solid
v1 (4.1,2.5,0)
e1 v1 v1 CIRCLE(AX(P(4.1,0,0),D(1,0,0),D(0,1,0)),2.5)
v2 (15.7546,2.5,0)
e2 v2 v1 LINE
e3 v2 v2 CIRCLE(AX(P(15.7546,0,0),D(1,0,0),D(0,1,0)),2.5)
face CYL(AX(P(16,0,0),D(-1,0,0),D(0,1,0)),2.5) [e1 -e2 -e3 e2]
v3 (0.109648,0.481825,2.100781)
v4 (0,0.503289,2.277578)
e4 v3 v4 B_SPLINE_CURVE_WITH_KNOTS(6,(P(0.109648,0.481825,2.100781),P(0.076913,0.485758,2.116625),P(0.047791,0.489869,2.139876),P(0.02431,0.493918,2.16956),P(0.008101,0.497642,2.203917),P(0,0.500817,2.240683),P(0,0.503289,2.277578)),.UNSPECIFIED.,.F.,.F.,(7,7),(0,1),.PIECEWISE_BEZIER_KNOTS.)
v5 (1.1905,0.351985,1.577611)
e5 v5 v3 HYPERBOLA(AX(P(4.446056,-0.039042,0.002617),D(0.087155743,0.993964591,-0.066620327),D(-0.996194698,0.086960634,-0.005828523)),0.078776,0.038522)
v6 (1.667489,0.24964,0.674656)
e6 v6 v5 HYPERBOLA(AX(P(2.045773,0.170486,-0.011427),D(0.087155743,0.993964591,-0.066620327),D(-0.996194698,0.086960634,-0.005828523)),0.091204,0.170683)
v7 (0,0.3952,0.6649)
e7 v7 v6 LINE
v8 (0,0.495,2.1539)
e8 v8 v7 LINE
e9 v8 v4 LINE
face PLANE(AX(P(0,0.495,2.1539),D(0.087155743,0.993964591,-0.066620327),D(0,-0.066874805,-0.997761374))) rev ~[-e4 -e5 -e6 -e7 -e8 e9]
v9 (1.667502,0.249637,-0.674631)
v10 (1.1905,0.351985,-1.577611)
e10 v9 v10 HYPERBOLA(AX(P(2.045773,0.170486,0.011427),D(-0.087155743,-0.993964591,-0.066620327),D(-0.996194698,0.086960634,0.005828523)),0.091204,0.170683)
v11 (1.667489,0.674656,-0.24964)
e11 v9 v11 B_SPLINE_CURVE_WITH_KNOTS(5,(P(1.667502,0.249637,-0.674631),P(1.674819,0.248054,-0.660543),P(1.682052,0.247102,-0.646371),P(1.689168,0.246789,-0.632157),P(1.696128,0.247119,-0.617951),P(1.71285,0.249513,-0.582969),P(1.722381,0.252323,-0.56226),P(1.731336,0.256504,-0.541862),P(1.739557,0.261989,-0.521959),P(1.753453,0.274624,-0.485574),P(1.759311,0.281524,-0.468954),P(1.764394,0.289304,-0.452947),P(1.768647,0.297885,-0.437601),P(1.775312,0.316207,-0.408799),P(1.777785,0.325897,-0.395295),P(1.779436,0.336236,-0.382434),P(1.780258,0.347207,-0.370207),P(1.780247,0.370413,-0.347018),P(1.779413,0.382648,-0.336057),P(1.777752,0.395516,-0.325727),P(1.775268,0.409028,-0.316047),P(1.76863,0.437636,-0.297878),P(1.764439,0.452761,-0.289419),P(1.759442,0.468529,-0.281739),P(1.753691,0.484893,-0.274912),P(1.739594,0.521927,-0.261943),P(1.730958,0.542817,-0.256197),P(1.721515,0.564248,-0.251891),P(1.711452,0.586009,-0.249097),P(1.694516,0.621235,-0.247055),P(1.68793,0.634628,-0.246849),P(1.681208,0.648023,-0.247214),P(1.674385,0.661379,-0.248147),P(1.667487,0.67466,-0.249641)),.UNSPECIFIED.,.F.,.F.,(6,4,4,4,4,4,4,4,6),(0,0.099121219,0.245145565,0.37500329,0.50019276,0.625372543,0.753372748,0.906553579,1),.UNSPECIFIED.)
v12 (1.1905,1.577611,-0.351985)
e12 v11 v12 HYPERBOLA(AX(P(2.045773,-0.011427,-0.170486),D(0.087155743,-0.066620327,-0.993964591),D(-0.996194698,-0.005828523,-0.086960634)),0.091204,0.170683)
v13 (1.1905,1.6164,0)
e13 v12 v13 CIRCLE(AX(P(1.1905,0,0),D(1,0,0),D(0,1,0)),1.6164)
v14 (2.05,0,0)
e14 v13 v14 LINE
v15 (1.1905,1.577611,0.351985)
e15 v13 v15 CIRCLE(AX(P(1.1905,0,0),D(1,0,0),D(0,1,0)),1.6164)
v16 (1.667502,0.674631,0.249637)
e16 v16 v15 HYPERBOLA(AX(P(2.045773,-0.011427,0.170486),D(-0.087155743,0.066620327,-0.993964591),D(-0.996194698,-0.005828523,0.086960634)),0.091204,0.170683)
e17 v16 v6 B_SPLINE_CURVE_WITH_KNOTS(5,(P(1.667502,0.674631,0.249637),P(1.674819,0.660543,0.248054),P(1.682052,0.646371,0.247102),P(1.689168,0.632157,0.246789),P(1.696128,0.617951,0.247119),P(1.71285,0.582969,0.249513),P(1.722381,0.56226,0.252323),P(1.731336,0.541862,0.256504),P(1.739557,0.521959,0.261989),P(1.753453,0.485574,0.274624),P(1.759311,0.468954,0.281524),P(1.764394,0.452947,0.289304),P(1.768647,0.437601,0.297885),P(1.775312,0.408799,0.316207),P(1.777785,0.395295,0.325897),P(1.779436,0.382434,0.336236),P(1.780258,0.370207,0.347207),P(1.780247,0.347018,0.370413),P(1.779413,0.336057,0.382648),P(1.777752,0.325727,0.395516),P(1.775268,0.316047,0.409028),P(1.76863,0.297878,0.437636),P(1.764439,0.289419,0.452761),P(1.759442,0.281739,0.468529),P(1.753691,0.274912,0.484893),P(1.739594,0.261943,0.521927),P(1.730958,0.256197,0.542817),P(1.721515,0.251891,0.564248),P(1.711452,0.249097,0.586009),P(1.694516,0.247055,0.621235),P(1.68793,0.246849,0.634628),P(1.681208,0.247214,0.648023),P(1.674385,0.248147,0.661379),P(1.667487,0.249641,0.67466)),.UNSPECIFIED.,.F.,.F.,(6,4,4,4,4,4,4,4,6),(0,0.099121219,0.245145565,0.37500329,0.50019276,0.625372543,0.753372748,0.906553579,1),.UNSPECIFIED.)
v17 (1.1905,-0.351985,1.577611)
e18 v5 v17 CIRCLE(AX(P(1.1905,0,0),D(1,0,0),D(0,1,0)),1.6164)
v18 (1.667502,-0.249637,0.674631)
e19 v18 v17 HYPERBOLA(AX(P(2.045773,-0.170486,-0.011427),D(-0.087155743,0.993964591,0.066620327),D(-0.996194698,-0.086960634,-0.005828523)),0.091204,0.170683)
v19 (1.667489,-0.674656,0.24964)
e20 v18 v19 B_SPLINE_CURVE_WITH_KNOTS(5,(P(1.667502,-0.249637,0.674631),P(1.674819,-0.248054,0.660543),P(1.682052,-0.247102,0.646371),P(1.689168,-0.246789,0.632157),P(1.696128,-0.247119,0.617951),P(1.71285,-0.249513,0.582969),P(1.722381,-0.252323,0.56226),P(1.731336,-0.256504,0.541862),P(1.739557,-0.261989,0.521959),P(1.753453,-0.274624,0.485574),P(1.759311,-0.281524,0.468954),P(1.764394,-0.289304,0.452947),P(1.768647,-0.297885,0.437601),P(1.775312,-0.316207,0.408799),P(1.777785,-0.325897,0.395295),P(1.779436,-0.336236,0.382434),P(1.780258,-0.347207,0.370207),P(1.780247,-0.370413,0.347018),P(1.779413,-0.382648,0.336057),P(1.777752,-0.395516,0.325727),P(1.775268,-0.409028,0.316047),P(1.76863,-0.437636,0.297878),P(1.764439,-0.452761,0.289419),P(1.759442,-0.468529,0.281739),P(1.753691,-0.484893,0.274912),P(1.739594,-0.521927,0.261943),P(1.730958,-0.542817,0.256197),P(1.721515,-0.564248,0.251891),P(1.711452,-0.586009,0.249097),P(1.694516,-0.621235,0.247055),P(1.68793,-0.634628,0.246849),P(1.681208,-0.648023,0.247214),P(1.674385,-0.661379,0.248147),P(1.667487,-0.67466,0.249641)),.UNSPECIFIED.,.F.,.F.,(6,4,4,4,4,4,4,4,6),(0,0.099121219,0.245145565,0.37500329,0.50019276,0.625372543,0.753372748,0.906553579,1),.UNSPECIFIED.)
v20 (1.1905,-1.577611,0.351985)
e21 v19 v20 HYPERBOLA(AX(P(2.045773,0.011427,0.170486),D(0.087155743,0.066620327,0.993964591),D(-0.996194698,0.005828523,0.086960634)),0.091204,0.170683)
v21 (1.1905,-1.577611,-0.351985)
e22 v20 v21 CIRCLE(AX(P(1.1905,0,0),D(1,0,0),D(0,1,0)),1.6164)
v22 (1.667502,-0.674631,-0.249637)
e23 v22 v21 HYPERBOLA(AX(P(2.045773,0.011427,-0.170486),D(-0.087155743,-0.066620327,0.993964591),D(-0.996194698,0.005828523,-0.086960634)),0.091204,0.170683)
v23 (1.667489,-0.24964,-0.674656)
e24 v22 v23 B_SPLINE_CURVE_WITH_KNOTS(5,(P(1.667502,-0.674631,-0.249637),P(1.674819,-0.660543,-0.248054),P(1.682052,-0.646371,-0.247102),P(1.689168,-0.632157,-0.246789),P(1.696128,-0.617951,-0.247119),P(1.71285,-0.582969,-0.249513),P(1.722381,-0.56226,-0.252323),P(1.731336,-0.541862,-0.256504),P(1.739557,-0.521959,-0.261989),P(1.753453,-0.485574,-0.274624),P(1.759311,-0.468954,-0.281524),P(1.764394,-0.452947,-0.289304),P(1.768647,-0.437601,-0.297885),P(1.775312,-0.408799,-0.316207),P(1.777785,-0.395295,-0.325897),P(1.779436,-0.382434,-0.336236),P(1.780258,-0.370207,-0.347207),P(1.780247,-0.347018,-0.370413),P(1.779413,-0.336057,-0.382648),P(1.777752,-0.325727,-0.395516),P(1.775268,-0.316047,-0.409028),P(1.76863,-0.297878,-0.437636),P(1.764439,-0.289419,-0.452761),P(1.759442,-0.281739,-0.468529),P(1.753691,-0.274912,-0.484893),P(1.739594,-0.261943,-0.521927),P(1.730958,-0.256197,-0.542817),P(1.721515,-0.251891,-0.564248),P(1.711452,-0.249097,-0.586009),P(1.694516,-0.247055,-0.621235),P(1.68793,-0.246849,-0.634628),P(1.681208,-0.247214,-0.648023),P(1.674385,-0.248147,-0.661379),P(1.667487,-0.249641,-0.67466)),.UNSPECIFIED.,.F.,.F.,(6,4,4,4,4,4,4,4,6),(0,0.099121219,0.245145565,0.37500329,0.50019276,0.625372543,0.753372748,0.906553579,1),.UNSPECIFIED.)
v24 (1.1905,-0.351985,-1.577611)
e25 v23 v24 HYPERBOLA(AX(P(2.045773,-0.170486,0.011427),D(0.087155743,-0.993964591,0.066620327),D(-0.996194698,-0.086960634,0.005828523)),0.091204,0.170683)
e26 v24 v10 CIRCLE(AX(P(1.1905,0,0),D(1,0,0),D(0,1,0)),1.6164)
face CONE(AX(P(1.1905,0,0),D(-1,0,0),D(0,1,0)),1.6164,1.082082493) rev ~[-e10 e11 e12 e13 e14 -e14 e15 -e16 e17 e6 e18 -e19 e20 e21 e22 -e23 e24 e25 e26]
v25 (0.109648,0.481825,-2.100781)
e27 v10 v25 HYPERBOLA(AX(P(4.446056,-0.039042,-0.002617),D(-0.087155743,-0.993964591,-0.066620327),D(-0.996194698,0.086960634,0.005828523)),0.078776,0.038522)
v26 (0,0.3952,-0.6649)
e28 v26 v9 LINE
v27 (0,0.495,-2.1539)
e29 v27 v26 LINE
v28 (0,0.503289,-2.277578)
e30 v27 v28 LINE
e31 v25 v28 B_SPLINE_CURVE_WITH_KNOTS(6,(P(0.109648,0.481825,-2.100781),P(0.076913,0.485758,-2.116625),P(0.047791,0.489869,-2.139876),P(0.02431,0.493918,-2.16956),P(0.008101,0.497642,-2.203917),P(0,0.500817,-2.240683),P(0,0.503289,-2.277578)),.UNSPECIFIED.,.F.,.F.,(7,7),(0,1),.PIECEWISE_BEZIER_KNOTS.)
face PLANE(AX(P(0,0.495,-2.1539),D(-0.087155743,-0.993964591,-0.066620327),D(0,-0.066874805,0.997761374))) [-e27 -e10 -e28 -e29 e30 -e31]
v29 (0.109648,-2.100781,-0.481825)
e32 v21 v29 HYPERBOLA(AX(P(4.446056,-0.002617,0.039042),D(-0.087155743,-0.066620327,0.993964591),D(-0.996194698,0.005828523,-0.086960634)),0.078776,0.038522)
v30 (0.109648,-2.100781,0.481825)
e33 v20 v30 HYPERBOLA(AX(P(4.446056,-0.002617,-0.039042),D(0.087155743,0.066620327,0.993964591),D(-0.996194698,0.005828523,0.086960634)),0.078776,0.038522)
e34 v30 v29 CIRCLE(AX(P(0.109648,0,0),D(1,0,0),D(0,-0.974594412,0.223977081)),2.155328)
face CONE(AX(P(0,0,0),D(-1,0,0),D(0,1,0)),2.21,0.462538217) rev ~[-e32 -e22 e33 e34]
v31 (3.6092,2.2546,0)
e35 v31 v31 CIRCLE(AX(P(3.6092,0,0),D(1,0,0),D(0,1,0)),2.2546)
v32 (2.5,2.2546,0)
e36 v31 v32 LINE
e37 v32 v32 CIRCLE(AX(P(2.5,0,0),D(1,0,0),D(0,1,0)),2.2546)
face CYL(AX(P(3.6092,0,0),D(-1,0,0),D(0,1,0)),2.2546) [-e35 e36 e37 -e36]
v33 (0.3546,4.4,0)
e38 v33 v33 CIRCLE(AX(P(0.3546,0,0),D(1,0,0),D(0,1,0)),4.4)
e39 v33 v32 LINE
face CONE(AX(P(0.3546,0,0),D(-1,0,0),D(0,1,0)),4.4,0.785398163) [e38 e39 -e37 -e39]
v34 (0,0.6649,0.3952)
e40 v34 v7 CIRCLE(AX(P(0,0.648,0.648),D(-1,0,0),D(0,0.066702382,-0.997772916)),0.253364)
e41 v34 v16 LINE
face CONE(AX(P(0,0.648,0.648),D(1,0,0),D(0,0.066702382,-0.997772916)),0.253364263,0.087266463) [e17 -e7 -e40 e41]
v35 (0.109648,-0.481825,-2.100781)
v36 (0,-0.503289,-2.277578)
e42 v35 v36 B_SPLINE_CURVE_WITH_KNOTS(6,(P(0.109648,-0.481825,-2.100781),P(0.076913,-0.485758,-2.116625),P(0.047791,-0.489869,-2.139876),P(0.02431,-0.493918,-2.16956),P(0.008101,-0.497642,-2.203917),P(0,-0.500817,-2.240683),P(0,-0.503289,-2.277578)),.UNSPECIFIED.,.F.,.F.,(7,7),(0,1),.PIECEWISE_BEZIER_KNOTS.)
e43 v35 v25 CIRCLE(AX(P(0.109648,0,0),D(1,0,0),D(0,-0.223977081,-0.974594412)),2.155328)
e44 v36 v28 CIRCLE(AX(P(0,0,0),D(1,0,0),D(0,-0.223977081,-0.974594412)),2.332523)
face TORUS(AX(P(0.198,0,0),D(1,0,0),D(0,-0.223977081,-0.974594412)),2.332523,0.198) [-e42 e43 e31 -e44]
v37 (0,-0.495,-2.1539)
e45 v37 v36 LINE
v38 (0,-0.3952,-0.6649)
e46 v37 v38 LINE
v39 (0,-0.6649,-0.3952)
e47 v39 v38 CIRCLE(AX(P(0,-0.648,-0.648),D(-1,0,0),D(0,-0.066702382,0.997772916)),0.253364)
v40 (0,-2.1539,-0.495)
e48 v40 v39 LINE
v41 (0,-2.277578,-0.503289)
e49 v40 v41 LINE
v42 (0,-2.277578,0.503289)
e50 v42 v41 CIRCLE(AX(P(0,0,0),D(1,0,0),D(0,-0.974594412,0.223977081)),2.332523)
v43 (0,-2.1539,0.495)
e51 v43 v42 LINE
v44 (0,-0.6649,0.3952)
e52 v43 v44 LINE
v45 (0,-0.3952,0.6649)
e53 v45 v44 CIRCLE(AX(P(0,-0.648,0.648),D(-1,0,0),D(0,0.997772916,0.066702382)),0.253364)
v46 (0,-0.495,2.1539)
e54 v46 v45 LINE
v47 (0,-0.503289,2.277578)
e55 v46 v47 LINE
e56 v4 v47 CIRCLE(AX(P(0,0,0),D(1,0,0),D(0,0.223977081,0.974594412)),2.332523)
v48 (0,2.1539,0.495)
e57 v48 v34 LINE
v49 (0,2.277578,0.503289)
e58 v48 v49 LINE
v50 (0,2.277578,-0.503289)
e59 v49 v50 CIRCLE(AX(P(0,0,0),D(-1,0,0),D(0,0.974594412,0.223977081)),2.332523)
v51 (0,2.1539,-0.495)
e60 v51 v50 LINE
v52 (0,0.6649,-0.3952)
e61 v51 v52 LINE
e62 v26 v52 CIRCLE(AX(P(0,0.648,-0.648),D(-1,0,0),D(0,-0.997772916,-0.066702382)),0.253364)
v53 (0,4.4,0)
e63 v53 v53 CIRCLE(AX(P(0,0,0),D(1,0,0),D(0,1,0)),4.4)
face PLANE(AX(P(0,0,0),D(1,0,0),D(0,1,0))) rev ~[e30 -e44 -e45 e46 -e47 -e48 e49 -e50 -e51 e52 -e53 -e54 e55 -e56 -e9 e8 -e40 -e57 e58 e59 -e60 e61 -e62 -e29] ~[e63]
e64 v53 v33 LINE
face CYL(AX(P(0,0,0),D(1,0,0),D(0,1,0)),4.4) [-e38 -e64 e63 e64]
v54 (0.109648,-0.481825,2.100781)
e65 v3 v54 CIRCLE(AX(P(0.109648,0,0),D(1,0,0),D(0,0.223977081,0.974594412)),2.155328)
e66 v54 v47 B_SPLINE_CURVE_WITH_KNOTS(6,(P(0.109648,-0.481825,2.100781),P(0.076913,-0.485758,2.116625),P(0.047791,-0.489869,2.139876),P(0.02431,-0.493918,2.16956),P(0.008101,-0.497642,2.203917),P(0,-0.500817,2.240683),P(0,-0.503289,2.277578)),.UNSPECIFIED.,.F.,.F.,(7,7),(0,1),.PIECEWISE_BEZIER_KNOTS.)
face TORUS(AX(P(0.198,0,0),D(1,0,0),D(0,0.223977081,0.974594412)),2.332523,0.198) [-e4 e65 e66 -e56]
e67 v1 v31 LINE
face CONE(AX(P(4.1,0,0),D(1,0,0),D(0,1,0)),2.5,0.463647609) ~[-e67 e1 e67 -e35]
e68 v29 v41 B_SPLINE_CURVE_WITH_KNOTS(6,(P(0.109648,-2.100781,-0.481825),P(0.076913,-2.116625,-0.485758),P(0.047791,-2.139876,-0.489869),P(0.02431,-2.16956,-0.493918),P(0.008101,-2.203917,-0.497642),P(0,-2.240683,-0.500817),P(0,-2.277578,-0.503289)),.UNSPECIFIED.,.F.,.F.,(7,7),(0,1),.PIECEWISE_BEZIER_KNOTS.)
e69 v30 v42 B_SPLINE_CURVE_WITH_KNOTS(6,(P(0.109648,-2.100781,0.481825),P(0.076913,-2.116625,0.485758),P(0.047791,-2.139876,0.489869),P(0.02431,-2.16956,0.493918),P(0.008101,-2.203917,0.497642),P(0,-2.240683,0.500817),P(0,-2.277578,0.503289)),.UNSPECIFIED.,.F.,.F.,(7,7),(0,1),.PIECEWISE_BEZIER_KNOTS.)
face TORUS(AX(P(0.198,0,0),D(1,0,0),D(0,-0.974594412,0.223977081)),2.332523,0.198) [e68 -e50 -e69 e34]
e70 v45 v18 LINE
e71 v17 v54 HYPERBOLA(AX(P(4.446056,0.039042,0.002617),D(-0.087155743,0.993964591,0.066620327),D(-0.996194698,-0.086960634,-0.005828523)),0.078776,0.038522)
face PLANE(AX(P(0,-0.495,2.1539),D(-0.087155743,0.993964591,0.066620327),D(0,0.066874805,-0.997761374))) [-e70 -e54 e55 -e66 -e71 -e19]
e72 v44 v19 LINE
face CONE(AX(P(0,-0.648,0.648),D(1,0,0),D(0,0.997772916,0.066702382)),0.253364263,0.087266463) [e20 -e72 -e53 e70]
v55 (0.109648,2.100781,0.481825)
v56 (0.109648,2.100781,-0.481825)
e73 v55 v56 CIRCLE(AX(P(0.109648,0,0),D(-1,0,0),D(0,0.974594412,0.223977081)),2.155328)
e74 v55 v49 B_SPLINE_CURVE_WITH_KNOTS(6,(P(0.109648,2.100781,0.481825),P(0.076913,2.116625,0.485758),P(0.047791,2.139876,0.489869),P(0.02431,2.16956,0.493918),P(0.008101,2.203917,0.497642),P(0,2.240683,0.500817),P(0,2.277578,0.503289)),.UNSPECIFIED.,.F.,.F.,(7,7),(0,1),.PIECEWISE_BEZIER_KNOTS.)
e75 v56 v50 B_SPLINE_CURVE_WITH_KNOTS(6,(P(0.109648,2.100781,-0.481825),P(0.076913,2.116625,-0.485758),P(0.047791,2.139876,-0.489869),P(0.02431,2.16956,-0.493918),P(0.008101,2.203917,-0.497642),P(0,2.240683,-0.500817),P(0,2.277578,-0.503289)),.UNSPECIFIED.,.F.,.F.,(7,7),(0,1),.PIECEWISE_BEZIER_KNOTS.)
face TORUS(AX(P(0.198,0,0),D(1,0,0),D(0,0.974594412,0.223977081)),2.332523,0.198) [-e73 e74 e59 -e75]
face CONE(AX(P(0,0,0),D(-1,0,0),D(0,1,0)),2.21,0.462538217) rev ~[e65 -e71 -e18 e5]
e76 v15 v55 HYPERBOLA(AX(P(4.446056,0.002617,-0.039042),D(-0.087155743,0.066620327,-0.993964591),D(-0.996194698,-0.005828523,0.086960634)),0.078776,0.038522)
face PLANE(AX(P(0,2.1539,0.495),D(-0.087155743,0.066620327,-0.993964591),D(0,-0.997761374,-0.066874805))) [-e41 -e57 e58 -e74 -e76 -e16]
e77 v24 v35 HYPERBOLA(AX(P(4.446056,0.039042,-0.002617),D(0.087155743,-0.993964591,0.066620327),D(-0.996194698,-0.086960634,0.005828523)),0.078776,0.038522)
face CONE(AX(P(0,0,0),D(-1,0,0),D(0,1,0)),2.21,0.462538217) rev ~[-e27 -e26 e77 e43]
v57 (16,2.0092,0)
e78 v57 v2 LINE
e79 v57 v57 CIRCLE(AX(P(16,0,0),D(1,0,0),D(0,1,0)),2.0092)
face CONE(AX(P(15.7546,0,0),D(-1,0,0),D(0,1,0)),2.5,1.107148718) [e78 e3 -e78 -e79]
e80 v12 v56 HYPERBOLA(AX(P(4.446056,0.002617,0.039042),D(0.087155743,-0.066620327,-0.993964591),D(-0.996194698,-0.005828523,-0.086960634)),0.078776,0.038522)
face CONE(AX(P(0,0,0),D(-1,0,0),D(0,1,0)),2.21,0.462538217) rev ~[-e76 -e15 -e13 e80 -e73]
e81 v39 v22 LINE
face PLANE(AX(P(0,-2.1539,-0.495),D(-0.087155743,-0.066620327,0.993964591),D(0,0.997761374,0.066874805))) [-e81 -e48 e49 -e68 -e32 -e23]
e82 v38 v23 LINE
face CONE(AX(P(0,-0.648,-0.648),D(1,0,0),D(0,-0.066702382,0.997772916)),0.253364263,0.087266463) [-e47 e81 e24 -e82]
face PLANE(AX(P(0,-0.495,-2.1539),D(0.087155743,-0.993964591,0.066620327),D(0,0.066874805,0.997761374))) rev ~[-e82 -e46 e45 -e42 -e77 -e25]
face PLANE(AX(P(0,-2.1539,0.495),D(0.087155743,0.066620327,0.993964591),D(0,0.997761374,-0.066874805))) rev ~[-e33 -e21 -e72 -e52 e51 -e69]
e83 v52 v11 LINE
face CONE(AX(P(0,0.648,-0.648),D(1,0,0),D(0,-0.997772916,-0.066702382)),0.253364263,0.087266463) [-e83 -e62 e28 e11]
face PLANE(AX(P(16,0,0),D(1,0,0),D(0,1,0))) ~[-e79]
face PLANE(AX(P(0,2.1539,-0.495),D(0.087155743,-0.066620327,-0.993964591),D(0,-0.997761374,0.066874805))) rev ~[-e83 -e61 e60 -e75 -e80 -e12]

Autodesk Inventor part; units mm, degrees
ref_plane "YZ Plane" through (0, 0, 0) normal (1, 0, 0) x (0, 1, 0)
ref_plane "XZ Plane" through (0, 0, 0) normal (0, 1, 0) x (-1, 0, 0)
sketch "Sketch1" plane through (0, 0, 0) normal (0, 0, 1) x (1, 0, 0)
  line L0 (2.05, 0) -> (16, 0)
  line L1 (16, 0) -> (16, 2.5)
  line L2 (16, 2.5) -> (4.1, 2.5)
  line L3 (4.1, 2.5) -> (3.6092, 2.2546)
  line L4 (3.6092, 2.2546) -> (2.5, 2.2546)
  line L5 (0, 4.4) -> (0, 2.21)
  line L6 (0, 2.21) -> (1.1905, 1.6164)
  line L7 (1.1905, 1.6164) -> (2.05, 0)
  line L8 (-3.2, 0) -> (19.2, 0) projected
  line L9 (0, -0.88) -> (0, 5.28) projected
  line L10 (0, 4.4) -> (0.3546, 4.4)
  line L11 (0.3546, 4.4) -> (2.5, 2.2546)
  line L12 (4.1, 2.5) -> (2.2546, 2.5) construction
  dimension "d1" = 11.9
  dimension "d2" = 5
  dimension "d3" = 4.5092
  dimension "d4" = 4.42
  dimension "d5" = 26.5
  dimension "d6" = 62
  dimension "d7" = 2.05
  dimension "d8" = 0.4908
  dimension "d12" = 8.8
  dimension "d13" = 45
  dimension "d15" = 16
  dimension "d24" = 2.5
revolve "Body" add sketch "Sketch1" angle 360 about axis through (2.05, 0, 0) along (1, 0, 0) contours L7 L6 L5 L10 L11 L4 L3 L2 L1 L0
sketch "Sketch2" plane through (0, 0, 0) normal (-1, 0, 0) x (0, 0, 1)
  line L0 (0, 2.21) -> (0, 0) construction
  line L1 (0, 0) -> (2.21, 0) construction
  arc A0 (0.663, 0) -> (0, 0.663) centre (0, 0) ccw construction
  arc A1 (0.7735, 0) -> (0, 0.7735) centre (0, 0) ccw construction
  arc A2 (2.1539, 0.495) -> (0.495, 2.1539) centre (0, 0) ccw
  line L2 (0, 0) -> (1.5627, 1.5627) construction
  line L3 (0.495, 2.1539) -> (0.3952, 0.6649)
  line L4 (2.1539, 0.495) -> (0.6649, 0.3952)
  arc A3 (0.495, 2.1539) -> (0, 2.21) centre (0, 0) ccw
  arc A4 (2.21, 0) -> (2.1539, 0.495) centre (0, 0) ccw
  line L5 (0, -6.16) -> (0, 6.16) projected
  line L6 (-6.16, 0) -> (6.16, 0) projected
  arc A5 (0.495, -2.1539) -> (2.1539, -0.495) centre (0, 0) ccw
  line L7 (0.495, -2.1539) -> (0.3952, -0.6649)
  line L8 (2.1539, -0.495) -> (0.6649, -0.3952)
  arc A6 (0, -2.21) -> (0.495, -2.1539) centre (0, 0) ccw
  arc A7 (2.1539, -0.495) -> (2.21, 0) centre (0, 0) ccw
  arc A8 (-0.495, 2.1539) -> (-2.1539, 0.495) centre (0, 0) ccw
  line L9 (-0.495, 2.1539) -> (-0.3952, 0.6649)
  line L10 (-2.1539, 0.495) -> (-0.6649, 0.3952)
  arc A9 (0, 2.21) -> (-0.495, 2.1539) centre (0, 0) ccw
  arc A10 (-2.1539, 0.495) -> (-2.21, 0) centre (0, 0) ccw
  arc A11 (-0.495, -2.1539) -> (0, -2.21) centre (0, 0) ccw
  arc A12 (-2.1539, -0.495) -> (-0.495, -2.1539) centre (0, 0) ccw
  arc A13 (-2.21, 0) -> (-2.1539, -0.495) centre (0, 0) ccw
  line L11 (-2.1539, -0.495) -> (-0.6649, -0.3952)
  line L12 (-0.495, -2.1539) -> (-0.3952, -0.6649)
  arc A14 (0.3952, 0.6649) -> (0.6649, 0.3952) centre (0.648, 0.648) ccw
  arc A15 (0.6649, -0.3952) -> (0.3952, -0.6649) centre (0.648, -0.648) ccw
  arc A16 (-0.6649, 0.3952) -> (-0.3952, 0.6649) centre (-0.648, 0.648) ccw
  arc A17 (-0.3952, -0.6649) -> (-0.6649, -0.3952) centre (-0.648, -0.648) ccw
  point P0 (1.5627, -1.5627)
  point P1 (-1.5627, 1.5627)
  point P2 (-1.5627, -1.5627)
  dimension "d17" = 1.326
  dimension "d18" = 1.547
  dimension "d19" = 4.42
  dimension "d20" = 45
  dimension "d21" = 0.495
extrude "Slot" add sketch "Sketch2" against normal up to next draft 5 contours L4 A14 L3 A2 | A5 L7 A15 L8 | L9 A16 L10 A8 | A12 L11 A17 L12
fillet "Fillet1" radius 0.198 4 edges at (0, 2.21, 0) (0, 0, -2.21) (0, -2.21, 0) (0, 0, 2.21)
thread "Thread" size "M5x0.8" class "6g" standard "ISO Metric profile" length 11.9
chamfer "Chamfer1" distance 0.4908 distance2 0.2454 1 edges at (16, -2.5, 0) measured on face at (16, 0.2278, 0.5045)
ref_plane "Work Plane2" through (3.35, 0, 0) normal (0, 0, -1) x (1, 0, 0)
equation "\"d1\" = GEL"
equation "\"d2\" = GD"
equation "\"d3\" = BDM"
equation "\"d4\" = SDM"
equation "\"d7\" = INTI"
equation "\"d8\" = GAL"
equation "\"d12\" = KOD"
equation "\"d13\" = 0.5 * SEWI"
equation "\"d15\" = NLG"
equation "\"d24\" = KOH"
equation "\"d17\" = 0.3 * SDM"
equation "\"d18\" = 0.35 * SDM"
equation "\"d19\" = SDM"
equation "\"d21\" = 0.5 * SBR"
equation "\"d23\" = 0.2 * SBR"
equation "\"d10\" = GEL"
equation "\"d25\" = -0.5 * SPD + 0.5 * GD"
equation "\"d26\" = 0.5 * GAL"
equation "\"NLG\" = 16"
equation "\"GEL\" = 11.9"
equation "\"GAL\" = 0.61345 * PTC"
equation "\"SPD\" = NND - 1.2269 * PTC"
equation "\"KOD\" = 8.8"
equation "\"KOH\" = 2.5"
equation "\"SBR\" = 0.99"
equation "\"INTI\" = 2.05"
equation "\"SDM\" = 4.42"
equation "\"GD\" = NND"
equation "\"BDM\" = NND - GAL"
equation "\"SEWI\" = 90deg"
equation "\"d9\" = SDM"
equation "\"GUL\" = 0.61345 * PTC"
equation "\"TOA\" = 30deg"
equation "\"EPV\" = 5"
equation "\"THREADDIA\" = 5"
equation "\"RR\" = 0.5"
equation "\"PTC\" = 0.8"
equation "\"NND\" = 5"
equation "\"GD1\" = THREADDIA - 1.2269 * PTC"
properties part number "AS 1427 - M5 x 16" material "Steel, Mild"
